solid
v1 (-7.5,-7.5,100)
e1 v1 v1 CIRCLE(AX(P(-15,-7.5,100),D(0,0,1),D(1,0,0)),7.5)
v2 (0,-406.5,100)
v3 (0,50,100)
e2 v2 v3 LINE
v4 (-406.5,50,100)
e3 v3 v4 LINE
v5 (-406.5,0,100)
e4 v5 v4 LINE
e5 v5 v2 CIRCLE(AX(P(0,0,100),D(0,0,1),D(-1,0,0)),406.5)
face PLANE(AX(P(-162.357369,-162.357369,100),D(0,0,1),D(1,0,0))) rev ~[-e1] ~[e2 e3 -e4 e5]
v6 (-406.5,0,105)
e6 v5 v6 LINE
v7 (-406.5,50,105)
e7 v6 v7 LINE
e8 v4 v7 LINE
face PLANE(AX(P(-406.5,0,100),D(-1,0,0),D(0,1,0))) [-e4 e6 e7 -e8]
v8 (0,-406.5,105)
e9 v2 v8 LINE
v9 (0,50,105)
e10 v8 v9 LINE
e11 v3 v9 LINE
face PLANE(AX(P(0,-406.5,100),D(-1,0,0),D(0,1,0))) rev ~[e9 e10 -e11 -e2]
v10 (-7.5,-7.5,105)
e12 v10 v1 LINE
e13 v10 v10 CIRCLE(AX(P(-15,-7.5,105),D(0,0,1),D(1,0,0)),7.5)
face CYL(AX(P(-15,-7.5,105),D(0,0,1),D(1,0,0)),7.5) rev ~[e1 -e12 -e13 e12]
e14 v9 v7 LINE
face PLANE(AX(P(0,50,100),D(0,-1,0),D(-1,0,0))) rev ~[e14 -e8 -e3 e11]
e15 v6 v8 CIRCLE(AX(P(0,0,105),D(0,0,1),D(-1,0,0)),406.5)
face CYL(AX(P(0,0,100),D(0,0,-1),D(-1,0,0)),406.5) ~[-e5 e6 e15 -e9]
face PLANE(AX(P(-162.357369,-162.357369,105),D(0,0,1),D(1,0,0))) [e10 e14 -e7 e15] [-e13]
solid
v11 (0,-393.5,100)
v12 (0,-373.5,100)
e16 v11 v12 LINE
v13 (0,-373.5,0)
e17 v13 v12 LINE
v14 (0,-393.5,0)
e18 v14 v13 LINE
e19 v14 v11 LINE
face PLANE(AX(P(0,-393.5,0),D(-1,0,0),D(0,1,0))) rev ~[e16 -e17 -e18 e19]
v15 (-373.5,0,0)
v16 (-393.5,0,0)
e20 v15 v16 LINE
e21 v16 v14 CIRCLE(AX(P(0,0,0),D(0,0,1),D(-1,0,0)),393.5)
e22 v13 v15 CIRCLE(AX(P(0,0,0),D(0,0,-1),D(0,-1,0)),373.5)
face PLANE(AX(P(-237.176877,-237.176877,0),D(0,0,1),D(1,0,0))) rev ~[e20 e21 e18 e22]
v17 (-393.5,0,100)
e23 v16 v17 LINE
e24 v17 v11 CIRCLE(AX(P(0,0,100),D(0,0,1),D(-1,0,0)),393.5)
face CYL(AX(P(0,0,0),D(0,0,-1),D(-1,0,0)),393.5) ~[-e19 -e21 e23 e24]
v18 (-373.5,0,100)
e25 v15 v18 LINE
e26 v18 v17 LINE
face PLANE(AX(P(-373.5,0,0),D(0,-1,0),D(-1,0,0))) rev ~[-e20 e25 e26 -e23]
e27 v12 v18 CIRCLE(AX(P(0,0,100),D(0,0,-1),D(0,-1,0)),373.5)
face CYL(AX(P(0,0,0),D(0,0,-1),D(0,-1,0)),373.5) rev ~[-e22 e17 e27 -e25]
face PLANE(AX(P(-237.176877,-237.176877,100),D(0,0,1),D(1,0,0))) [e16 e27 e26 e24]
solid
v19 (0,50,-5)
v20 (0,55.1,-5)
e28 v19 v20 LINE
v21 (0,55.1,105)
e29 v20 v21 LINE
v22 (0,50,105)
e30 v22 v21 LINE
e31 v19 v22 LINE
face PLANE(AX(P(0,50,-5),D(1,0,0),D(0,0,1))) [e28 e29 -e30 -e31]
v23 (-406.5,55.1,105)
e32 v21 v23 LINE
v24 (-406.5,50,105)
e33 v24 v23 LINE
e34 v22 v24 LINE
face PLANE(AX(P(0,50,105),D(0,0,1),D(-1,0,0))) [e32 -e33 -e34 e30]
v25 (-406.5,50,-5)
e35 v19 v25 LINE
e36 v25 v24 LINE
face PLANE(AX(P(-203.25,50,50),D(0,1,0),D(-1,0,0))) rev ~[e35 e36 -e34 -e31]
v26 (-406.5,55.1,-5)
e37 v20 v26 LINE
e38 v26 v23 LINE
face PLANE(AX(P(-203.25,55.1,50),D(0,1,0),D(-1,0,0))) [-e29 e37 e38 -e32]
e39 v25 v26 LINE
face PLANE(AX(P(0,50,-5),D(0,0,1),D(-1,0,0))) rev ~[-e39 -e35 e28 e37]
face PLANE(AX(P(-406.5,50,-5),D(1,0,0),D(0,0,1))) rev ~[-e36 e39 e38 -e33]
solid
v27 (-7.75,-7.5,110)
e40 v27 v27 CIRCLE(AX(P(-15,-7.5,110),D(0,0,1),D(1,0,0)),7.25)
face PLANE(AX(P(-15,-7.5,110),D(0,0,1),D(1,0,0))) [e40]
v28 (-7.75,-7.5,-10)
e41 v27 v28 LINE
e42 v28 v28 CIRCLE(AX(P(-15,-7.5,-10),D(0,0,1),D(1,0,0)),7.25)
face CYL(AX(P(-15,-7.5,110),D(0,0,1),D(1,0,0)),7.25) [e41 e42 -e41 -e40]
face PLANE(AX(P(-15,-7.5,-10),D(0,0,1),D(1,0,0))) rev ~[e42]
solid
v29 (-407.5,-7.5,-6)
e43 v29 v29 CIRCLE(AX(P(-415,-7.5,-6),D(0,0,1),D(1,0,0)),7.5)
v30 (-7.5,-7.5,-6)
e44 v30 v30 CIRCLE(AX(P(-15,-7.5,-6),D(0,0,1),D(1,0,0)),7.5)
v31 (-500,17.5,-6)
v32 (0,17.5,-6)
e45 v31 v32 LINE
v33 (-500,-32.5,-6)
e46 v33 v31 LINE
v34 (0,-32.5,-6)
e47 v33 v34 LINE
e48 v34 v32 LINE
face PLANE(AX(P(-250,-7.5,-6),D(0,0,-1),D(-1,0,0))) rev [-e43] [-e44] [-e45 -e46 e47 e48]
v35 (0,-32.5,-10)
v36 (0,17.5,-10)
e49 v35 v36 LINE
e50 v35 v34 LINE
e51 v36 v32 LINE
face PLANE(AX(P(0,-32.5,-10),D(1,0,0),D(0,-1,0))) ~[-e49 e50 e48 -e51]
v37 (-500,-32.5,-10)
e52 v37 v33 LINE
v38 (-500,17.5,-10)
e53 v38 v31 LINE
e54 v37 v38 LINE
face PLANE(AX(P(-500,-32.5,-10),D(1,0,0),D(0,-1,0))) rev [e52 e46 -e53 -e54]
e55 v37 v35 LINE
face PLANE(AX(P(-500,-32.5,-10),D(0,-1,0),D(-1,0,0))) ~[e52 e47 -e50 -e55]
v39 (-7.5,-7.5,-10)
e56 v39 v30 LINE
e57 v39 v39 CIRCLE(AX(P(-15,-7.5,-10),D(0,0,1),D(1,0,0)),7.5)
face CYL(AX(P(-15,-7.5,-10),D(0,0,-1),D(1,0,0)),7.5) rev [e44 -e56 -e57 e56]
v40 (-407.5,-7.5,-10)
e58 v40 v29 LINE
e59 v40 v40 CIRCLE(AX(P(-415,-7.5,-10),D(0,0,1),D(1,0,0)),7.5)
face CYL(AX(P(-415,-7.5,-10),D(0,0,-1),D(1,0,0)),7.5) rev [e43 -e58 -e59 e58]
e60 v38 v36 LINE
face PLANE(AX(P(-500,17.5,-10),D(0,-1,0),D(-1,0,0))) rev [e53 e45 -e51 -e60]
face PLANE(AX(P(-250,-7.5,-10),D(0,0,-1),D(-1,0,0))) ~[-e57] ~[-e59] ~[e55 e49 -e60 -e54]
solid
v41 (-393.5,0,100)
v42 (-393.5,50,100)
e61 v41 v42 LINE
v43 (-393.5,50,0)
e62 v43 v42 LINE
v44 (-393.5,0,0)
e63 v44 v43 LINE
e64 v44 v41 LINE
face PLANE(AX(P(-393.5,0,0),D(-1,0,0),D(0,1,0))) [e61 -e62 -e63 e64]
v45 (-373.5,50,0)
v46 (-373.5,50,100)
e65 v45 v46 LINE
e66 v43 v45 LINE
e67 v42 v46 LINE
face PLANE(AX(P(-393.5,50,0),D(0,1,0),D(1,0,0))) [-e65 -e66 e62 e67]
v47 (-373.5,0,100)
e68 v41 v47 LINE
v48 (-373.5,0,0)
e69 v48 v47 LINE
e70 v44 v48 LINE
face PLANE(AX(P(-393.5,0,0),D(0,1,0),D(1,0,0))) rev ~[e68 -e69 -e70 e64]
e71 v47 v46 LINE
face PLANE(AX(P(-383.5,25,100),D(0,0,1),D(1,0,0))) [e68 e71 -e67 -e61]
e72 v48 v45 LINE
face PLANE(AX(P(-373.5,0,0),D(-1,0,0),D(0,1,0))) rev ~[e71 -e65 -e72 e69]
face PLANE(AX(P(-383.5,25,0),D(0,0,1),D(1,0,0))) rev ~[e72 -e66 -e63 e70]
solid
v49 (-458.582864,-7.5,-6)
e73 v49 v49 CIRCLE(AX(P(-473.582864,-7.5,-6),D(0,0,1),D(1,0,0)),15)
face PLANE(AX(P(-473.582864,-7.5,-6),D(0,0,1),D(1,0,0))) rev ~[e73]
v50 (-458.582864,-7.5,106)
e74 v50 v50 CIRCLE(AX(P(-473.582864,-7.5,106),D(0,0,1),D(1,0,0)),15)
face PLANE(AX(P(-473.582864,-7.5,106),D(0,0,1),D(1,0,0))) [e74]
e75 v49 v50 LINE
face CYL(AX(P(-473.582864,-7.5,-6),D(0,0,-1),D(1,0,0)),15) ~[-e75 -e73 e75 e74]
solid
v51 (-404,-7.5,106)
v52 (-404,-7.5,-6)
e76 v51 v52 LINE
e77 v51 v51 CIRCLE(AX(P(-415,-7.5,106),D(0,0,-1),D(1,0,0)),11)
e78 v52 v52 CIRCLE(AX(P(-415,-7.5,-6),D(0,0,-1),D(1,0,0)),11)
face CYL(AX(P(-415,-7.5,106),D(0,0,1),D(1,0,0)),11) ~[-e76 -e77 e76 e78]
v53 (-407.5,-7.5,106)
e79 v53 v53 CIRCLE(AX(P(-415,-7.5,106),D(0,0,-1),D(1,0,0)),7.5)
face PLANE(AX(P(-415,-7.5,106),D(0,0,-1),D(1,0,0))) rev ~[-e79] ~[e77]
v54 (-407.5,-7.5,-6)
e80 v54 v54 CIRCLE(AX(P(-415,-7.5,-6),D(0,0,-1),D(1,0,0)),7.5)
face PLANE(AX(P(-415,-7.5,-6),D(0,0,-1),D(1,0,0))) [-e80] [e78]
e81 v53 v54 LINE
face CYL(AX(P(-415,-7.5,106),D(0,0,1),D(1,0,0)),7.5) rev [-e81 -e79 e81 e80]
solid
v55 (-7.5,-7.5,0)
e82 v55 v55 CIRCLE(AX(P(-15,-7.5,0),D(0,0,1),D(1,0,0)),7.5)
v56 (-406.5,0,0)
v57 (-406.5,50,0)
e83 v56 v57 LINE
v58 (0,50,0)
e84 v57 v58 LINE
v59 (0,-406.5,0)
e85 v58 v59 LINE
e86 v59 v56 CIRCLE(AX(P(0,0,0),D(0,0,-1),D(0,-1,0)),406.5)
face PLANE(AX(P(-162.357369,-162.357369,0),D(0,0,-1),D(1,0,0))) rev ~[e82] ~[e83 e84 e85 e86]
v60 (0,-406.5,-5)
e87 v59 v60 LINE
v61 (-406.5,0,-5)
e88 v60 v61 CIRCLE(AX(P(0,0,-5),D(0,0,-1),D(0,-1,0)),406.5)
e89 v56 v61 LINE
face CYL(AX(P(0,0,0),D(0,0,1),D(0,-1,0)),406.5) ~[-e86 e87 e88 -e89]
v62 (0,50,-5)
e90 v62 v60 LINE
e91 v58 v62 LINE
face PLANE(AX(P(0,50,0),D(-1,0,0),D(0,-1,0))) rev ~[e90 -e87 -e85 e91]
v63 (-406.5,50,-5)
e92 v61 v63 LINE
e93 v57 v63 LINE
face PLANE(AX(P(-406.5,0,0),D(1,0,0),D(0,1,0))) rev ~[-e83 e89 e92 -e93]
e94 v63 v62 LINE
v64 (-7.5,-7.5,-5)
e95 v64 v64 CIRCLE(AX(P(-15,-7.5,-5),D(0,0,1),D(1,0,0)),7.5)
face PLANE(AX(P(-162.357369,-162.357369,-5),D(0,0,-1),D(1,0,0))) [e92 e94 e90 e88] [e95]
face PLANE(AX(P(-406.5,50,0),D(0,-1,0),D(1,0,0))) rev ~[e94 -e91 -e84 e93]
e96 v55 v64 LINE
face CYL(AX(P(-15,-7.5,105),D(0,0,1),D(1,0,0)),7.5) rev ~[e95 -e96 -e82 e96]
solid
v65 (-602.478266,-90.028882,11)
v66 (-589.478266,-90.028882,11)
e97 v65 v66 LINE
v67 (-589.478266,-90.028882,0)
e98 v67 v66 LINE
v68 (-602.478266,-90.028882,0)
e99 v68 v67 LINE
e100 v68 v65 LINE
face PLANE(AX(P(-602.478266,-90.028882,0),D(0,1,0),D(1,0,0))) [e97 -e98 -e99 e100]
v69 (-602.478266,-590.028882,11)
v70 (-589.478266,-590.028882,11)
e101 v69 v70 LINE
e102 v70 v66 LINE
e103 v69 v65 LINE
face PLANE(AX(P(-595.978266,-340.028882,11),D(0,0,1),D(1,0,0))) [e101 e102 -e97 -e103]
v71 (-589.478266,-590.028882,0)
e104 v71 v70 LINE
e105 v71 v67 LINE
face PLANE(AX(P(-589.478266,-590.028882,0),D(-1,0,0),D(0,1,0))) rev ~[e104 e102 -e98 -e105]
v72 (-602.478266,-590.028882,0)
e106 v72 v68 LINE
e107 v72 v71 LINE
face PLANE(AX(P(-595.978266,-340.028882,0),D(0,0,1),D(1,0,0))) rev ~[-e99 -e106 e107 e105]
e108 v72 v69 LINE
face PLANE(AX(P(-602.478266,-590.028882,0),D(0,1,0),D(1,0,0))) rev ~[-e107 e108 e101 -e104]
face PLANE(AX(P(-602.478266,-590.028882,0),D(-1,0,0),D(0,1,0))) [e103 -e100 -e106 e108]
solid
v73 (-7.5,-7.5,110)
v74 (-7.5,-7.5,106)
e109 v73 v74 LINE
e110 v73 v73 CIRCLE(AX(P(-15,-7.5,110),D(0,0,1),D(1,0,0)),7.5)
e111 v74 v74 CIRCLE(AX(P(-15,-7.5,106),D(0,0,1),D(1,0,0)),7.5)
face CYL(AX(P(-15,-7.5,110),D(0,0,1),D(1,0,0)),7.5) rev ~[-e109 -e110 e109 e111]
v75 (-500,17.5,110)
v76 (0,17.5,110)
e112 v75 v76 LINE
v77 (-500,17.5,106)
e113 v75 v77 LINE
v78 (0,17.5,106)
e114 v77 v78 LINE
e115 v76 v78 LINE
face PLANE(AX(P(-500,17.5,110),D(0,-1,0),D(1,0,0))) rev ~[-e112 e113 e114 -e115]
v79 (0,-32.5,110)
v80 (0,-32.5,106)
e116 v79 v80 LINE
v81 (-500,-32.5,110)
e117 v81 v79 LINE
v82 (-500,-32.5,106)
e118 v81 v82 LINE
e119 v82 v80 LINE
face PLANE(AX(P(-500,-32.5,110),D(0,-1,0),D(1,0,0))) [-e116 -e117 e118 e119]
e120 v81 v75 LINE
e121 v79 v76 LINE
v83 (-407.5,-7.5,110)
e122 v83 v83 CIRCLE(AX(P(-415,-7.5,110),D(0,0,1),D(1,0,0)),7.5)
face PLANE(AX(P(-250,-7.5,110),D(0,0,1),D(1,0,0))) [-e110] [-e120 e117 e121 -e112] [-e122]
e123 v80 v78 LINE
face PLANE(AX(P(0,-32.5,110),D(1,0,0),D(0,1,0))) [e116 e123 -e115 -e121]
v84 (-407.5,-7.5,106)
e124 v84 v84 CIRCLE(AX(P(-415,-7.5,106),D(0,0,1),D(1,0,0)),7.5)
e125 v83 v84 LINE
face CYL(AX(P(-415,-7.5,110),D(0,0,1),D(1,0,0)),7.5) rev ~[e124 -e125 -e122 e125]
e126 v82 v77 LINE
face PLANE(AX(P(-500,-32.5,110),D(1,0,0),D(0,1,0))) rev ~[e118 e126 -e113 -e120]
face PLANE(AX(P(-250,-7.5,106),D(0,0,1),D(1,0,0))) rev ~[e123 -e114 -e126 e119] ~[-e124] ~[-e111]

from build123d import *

# Parameters (mm, degrees)
F1_DEPTH  = 100
F4_DEPTH  = 5
F6_W      = 393.5
F6_H      = 50
F6_W_2    = 13
F7_DEPTH  = 5
F9_W      = 406.5
F9_H      = 110
F10_DEPTH = 5.1
F11_R     = 7.5
F12_DEPTH = 110.001
F14_R     = 7.25
F15_DEPTH = 120
F17_W     = 500
F17_H     = 50
F17_R     = 7.5
F18_DEPTH = 4
F0_W      = 20
F0_H      = 50
F21_DEPTH = 100
F22_R     = 15
F23_DEPTH = 112
F24_R     = 11
F24_R_2   = 7.5
F25_DEPTH = 112
F26_W     = 13
F26_H     = 500
F27_DEPTH = 11


# Not quite as in the source:
# - a feature names something its author has since deleted; it is built from what else it names


with BuildPart() as f1:
    # F0 (on Top) → F1 (new body)
    with BuildSketch(Plane.XY):
        with BuildLine():
            ThreePointArc((0, -373.5), (-264.1043827732, -264.1043827732), (-373.5, 0))
            Line((-373.5, 0), (-393.5, 0))
            ThreePointArc((-393.5, 0), (-278.2465183969, -278.2465183969), (0, -393.5))
            Line((0, -393.5), (0, -373.5))
        make_face()
    extrude(amount=F1_DEPTH)


with BuildPart() as f4:
    # F3 (on offset) → F4 (new body)
    with BuildSketch(Plane(origin=(0, 0, 0), x_dir=(1, 0, 0), z_dir=(0, 0, -1))):
        with BuildLine():
            Line((-393.5, 0), (0, 0))
            Line((0, 0), (0, 393.5))
            ThreePointArc((0, 393.5), (-278.2465183969, 278.2465183969), (-393.5, 0))
        make_face()
        Polygon((0, -50), (0, 0), (-393.5, 0), (-406.5, 0), (-406.5, -50), align=None)
        with BuildLine():
            ThreePointArc((-393.5, 0), (-278.2465183969, 278.2465183969), (0, 393.5))
            Line((0, 393.5), (0, 406.5))
            ThreePointArc((0, 406.5), (-287.4389065523, 287.4389065523), (-406.5, 0))
            Line((-406.5, 0), (-393.5, 0))
        make_face()
    extrude(amount=F4_DEPTH)


with BuildPart() as f7:
    # F6 (on offset) → F7 (new body)
    with BuildSketch(Plane.XY.offset(100)):
        with BuildLine():
            Line((0, -393.5), (0, 0))
            Line((0, 0), (-393.5, 0))
            ThreePointArc((-393.5, 0), (-278.2465183969, -278.2465183969), (0, -393.5))
        make_face()
        with Locations((-196.75, 25)):
            Rectangle(F6_W, F6_H)
        with BuildLine():
            Line((0, -406.5), (0, -393.5))
            ThreePointArc((0, -393.5), (-278.2465183969, -278.2465183969), (-393.5, 0))
            Line((-393.5, 0), (-406.5, 0))
            ThreePointArc((-406.5, 0), (-287.4389065523, -287.4389065523), (0, -406.5))
        make_face()
        with Locations((-400, 25)):
            Rectangle(F6_W_2, F6_H)
    extrude(amount=F7_DEPTH)


with BuildPart() as f10:
    # F9 (on offset) → F10 (new body)
    with BuildSketch(Plane(origin=(0, 50, 0), x_dir=(-1, 0, 0), z_dir=(0, 1, 0))):
        with Locations((203.25, 50)):
            Rectangle(F9_W, F9_H)
    extrude(amount=F10_DEPTH)


with BuildPart() as f12_tool:
    # F11 (on face) → F12 (new body, through all)
    with BuildSketch(Plane.XY.offset(105)):
        with Locations((-15, -7.5)):
            Circle(F11_R)
    extrude(amount=-F12_DEPTH)


with BuildPart() as f4_1:
    add(f4.part)

    # F12: cut by f12_tool
    add(f12_tool.part, mode=Mode.SUBTRACT)


with BuildPart() as f7_1:
    add(f7.part)

    # F12: cut by f12_tool
    add(f12_tool.part, mode=Mode.SUBTRACT)


with BuildPart() as f15:
    # F14 (on offset) → F15 (new body)
    with BuildSketch(Plane.XY.offset(110)):
        with Locations((-15, -7.5)):
            Circle(F14_R)
    extrude(amount=-F15_DEPTH)


with BuildPart() as f18:
    # F17 (on offset) → F18 (new body)
    with BuildSketch(Plane.XY.offset(110)):
        with Locations((-250, -7.5)):
            Rectangle(F17_W, F17_H)
        with Locations((-415, -7.5)):
            Circle(F17_R, mode=Mode.SUBTRACT)
        with Locations((-15, -7.5)):
            Circle(F17_R, mode=Mode.SUBTRACT)
    extrude(amount=-F18_DEPTH)


with BuildPart() as f20_1:
    # F20: instance of F18
    add(f18.part.mirror(Plane(origin=(-244.1990168857, -244.1990168857, 50), x_dir=(1, 0, 0), z_dir=(0, 0, 1))))


with BuildPart() as f21:
    # F0 (on Top) → F21 (new body)
    with BuildSketch(Plane.XY):
        with Locations((-383.5, 25)):
            Rectangle(F0_W, F0_H)
    extrude(amount=F21_DEPTH)


with BuildPart() as f23:
    # F22 (on face) → F23 (new body, through all)
    with BuildSketch(Plane.XY.offset(-6)):
        with Locations((-473.5828638077, -7.5)):
            Circle(F22_R)
    extrude(amount=F23_DEPTH)


with BuildPart() as f25:
    # F24 (on face) → F25 (new body, through all)
    with BuildSketch(Plane(origin=(0, 0, 106), x_dir=(1, 0, 0), z_dir=(0, 0, -1))):
        with Locations((-415, 7.5)):
            Circle(F24_R)
        with Locations((-415, 7.5)):
            Circle(F24_R_2, mode=Mode.SUBTRACT)
    extrude(amount=F25_DEPTH)


with BuildPart() as f27:
    # F26 (on Top) → F27 (new body)
    with BuildSketch(Plane.XY):
        with Locations((-595.9782657623, -340.0288820267)):
            Rectangle(F26_W, F26_H)
    extrude(amount=F27_DEPTH)


solid = Compound([f1.part, f10.part, f4_1.part, f7_1.part, f15.part, f18.part, f20_1.part, f21.part, f23.part, f25.part, f27.part])
